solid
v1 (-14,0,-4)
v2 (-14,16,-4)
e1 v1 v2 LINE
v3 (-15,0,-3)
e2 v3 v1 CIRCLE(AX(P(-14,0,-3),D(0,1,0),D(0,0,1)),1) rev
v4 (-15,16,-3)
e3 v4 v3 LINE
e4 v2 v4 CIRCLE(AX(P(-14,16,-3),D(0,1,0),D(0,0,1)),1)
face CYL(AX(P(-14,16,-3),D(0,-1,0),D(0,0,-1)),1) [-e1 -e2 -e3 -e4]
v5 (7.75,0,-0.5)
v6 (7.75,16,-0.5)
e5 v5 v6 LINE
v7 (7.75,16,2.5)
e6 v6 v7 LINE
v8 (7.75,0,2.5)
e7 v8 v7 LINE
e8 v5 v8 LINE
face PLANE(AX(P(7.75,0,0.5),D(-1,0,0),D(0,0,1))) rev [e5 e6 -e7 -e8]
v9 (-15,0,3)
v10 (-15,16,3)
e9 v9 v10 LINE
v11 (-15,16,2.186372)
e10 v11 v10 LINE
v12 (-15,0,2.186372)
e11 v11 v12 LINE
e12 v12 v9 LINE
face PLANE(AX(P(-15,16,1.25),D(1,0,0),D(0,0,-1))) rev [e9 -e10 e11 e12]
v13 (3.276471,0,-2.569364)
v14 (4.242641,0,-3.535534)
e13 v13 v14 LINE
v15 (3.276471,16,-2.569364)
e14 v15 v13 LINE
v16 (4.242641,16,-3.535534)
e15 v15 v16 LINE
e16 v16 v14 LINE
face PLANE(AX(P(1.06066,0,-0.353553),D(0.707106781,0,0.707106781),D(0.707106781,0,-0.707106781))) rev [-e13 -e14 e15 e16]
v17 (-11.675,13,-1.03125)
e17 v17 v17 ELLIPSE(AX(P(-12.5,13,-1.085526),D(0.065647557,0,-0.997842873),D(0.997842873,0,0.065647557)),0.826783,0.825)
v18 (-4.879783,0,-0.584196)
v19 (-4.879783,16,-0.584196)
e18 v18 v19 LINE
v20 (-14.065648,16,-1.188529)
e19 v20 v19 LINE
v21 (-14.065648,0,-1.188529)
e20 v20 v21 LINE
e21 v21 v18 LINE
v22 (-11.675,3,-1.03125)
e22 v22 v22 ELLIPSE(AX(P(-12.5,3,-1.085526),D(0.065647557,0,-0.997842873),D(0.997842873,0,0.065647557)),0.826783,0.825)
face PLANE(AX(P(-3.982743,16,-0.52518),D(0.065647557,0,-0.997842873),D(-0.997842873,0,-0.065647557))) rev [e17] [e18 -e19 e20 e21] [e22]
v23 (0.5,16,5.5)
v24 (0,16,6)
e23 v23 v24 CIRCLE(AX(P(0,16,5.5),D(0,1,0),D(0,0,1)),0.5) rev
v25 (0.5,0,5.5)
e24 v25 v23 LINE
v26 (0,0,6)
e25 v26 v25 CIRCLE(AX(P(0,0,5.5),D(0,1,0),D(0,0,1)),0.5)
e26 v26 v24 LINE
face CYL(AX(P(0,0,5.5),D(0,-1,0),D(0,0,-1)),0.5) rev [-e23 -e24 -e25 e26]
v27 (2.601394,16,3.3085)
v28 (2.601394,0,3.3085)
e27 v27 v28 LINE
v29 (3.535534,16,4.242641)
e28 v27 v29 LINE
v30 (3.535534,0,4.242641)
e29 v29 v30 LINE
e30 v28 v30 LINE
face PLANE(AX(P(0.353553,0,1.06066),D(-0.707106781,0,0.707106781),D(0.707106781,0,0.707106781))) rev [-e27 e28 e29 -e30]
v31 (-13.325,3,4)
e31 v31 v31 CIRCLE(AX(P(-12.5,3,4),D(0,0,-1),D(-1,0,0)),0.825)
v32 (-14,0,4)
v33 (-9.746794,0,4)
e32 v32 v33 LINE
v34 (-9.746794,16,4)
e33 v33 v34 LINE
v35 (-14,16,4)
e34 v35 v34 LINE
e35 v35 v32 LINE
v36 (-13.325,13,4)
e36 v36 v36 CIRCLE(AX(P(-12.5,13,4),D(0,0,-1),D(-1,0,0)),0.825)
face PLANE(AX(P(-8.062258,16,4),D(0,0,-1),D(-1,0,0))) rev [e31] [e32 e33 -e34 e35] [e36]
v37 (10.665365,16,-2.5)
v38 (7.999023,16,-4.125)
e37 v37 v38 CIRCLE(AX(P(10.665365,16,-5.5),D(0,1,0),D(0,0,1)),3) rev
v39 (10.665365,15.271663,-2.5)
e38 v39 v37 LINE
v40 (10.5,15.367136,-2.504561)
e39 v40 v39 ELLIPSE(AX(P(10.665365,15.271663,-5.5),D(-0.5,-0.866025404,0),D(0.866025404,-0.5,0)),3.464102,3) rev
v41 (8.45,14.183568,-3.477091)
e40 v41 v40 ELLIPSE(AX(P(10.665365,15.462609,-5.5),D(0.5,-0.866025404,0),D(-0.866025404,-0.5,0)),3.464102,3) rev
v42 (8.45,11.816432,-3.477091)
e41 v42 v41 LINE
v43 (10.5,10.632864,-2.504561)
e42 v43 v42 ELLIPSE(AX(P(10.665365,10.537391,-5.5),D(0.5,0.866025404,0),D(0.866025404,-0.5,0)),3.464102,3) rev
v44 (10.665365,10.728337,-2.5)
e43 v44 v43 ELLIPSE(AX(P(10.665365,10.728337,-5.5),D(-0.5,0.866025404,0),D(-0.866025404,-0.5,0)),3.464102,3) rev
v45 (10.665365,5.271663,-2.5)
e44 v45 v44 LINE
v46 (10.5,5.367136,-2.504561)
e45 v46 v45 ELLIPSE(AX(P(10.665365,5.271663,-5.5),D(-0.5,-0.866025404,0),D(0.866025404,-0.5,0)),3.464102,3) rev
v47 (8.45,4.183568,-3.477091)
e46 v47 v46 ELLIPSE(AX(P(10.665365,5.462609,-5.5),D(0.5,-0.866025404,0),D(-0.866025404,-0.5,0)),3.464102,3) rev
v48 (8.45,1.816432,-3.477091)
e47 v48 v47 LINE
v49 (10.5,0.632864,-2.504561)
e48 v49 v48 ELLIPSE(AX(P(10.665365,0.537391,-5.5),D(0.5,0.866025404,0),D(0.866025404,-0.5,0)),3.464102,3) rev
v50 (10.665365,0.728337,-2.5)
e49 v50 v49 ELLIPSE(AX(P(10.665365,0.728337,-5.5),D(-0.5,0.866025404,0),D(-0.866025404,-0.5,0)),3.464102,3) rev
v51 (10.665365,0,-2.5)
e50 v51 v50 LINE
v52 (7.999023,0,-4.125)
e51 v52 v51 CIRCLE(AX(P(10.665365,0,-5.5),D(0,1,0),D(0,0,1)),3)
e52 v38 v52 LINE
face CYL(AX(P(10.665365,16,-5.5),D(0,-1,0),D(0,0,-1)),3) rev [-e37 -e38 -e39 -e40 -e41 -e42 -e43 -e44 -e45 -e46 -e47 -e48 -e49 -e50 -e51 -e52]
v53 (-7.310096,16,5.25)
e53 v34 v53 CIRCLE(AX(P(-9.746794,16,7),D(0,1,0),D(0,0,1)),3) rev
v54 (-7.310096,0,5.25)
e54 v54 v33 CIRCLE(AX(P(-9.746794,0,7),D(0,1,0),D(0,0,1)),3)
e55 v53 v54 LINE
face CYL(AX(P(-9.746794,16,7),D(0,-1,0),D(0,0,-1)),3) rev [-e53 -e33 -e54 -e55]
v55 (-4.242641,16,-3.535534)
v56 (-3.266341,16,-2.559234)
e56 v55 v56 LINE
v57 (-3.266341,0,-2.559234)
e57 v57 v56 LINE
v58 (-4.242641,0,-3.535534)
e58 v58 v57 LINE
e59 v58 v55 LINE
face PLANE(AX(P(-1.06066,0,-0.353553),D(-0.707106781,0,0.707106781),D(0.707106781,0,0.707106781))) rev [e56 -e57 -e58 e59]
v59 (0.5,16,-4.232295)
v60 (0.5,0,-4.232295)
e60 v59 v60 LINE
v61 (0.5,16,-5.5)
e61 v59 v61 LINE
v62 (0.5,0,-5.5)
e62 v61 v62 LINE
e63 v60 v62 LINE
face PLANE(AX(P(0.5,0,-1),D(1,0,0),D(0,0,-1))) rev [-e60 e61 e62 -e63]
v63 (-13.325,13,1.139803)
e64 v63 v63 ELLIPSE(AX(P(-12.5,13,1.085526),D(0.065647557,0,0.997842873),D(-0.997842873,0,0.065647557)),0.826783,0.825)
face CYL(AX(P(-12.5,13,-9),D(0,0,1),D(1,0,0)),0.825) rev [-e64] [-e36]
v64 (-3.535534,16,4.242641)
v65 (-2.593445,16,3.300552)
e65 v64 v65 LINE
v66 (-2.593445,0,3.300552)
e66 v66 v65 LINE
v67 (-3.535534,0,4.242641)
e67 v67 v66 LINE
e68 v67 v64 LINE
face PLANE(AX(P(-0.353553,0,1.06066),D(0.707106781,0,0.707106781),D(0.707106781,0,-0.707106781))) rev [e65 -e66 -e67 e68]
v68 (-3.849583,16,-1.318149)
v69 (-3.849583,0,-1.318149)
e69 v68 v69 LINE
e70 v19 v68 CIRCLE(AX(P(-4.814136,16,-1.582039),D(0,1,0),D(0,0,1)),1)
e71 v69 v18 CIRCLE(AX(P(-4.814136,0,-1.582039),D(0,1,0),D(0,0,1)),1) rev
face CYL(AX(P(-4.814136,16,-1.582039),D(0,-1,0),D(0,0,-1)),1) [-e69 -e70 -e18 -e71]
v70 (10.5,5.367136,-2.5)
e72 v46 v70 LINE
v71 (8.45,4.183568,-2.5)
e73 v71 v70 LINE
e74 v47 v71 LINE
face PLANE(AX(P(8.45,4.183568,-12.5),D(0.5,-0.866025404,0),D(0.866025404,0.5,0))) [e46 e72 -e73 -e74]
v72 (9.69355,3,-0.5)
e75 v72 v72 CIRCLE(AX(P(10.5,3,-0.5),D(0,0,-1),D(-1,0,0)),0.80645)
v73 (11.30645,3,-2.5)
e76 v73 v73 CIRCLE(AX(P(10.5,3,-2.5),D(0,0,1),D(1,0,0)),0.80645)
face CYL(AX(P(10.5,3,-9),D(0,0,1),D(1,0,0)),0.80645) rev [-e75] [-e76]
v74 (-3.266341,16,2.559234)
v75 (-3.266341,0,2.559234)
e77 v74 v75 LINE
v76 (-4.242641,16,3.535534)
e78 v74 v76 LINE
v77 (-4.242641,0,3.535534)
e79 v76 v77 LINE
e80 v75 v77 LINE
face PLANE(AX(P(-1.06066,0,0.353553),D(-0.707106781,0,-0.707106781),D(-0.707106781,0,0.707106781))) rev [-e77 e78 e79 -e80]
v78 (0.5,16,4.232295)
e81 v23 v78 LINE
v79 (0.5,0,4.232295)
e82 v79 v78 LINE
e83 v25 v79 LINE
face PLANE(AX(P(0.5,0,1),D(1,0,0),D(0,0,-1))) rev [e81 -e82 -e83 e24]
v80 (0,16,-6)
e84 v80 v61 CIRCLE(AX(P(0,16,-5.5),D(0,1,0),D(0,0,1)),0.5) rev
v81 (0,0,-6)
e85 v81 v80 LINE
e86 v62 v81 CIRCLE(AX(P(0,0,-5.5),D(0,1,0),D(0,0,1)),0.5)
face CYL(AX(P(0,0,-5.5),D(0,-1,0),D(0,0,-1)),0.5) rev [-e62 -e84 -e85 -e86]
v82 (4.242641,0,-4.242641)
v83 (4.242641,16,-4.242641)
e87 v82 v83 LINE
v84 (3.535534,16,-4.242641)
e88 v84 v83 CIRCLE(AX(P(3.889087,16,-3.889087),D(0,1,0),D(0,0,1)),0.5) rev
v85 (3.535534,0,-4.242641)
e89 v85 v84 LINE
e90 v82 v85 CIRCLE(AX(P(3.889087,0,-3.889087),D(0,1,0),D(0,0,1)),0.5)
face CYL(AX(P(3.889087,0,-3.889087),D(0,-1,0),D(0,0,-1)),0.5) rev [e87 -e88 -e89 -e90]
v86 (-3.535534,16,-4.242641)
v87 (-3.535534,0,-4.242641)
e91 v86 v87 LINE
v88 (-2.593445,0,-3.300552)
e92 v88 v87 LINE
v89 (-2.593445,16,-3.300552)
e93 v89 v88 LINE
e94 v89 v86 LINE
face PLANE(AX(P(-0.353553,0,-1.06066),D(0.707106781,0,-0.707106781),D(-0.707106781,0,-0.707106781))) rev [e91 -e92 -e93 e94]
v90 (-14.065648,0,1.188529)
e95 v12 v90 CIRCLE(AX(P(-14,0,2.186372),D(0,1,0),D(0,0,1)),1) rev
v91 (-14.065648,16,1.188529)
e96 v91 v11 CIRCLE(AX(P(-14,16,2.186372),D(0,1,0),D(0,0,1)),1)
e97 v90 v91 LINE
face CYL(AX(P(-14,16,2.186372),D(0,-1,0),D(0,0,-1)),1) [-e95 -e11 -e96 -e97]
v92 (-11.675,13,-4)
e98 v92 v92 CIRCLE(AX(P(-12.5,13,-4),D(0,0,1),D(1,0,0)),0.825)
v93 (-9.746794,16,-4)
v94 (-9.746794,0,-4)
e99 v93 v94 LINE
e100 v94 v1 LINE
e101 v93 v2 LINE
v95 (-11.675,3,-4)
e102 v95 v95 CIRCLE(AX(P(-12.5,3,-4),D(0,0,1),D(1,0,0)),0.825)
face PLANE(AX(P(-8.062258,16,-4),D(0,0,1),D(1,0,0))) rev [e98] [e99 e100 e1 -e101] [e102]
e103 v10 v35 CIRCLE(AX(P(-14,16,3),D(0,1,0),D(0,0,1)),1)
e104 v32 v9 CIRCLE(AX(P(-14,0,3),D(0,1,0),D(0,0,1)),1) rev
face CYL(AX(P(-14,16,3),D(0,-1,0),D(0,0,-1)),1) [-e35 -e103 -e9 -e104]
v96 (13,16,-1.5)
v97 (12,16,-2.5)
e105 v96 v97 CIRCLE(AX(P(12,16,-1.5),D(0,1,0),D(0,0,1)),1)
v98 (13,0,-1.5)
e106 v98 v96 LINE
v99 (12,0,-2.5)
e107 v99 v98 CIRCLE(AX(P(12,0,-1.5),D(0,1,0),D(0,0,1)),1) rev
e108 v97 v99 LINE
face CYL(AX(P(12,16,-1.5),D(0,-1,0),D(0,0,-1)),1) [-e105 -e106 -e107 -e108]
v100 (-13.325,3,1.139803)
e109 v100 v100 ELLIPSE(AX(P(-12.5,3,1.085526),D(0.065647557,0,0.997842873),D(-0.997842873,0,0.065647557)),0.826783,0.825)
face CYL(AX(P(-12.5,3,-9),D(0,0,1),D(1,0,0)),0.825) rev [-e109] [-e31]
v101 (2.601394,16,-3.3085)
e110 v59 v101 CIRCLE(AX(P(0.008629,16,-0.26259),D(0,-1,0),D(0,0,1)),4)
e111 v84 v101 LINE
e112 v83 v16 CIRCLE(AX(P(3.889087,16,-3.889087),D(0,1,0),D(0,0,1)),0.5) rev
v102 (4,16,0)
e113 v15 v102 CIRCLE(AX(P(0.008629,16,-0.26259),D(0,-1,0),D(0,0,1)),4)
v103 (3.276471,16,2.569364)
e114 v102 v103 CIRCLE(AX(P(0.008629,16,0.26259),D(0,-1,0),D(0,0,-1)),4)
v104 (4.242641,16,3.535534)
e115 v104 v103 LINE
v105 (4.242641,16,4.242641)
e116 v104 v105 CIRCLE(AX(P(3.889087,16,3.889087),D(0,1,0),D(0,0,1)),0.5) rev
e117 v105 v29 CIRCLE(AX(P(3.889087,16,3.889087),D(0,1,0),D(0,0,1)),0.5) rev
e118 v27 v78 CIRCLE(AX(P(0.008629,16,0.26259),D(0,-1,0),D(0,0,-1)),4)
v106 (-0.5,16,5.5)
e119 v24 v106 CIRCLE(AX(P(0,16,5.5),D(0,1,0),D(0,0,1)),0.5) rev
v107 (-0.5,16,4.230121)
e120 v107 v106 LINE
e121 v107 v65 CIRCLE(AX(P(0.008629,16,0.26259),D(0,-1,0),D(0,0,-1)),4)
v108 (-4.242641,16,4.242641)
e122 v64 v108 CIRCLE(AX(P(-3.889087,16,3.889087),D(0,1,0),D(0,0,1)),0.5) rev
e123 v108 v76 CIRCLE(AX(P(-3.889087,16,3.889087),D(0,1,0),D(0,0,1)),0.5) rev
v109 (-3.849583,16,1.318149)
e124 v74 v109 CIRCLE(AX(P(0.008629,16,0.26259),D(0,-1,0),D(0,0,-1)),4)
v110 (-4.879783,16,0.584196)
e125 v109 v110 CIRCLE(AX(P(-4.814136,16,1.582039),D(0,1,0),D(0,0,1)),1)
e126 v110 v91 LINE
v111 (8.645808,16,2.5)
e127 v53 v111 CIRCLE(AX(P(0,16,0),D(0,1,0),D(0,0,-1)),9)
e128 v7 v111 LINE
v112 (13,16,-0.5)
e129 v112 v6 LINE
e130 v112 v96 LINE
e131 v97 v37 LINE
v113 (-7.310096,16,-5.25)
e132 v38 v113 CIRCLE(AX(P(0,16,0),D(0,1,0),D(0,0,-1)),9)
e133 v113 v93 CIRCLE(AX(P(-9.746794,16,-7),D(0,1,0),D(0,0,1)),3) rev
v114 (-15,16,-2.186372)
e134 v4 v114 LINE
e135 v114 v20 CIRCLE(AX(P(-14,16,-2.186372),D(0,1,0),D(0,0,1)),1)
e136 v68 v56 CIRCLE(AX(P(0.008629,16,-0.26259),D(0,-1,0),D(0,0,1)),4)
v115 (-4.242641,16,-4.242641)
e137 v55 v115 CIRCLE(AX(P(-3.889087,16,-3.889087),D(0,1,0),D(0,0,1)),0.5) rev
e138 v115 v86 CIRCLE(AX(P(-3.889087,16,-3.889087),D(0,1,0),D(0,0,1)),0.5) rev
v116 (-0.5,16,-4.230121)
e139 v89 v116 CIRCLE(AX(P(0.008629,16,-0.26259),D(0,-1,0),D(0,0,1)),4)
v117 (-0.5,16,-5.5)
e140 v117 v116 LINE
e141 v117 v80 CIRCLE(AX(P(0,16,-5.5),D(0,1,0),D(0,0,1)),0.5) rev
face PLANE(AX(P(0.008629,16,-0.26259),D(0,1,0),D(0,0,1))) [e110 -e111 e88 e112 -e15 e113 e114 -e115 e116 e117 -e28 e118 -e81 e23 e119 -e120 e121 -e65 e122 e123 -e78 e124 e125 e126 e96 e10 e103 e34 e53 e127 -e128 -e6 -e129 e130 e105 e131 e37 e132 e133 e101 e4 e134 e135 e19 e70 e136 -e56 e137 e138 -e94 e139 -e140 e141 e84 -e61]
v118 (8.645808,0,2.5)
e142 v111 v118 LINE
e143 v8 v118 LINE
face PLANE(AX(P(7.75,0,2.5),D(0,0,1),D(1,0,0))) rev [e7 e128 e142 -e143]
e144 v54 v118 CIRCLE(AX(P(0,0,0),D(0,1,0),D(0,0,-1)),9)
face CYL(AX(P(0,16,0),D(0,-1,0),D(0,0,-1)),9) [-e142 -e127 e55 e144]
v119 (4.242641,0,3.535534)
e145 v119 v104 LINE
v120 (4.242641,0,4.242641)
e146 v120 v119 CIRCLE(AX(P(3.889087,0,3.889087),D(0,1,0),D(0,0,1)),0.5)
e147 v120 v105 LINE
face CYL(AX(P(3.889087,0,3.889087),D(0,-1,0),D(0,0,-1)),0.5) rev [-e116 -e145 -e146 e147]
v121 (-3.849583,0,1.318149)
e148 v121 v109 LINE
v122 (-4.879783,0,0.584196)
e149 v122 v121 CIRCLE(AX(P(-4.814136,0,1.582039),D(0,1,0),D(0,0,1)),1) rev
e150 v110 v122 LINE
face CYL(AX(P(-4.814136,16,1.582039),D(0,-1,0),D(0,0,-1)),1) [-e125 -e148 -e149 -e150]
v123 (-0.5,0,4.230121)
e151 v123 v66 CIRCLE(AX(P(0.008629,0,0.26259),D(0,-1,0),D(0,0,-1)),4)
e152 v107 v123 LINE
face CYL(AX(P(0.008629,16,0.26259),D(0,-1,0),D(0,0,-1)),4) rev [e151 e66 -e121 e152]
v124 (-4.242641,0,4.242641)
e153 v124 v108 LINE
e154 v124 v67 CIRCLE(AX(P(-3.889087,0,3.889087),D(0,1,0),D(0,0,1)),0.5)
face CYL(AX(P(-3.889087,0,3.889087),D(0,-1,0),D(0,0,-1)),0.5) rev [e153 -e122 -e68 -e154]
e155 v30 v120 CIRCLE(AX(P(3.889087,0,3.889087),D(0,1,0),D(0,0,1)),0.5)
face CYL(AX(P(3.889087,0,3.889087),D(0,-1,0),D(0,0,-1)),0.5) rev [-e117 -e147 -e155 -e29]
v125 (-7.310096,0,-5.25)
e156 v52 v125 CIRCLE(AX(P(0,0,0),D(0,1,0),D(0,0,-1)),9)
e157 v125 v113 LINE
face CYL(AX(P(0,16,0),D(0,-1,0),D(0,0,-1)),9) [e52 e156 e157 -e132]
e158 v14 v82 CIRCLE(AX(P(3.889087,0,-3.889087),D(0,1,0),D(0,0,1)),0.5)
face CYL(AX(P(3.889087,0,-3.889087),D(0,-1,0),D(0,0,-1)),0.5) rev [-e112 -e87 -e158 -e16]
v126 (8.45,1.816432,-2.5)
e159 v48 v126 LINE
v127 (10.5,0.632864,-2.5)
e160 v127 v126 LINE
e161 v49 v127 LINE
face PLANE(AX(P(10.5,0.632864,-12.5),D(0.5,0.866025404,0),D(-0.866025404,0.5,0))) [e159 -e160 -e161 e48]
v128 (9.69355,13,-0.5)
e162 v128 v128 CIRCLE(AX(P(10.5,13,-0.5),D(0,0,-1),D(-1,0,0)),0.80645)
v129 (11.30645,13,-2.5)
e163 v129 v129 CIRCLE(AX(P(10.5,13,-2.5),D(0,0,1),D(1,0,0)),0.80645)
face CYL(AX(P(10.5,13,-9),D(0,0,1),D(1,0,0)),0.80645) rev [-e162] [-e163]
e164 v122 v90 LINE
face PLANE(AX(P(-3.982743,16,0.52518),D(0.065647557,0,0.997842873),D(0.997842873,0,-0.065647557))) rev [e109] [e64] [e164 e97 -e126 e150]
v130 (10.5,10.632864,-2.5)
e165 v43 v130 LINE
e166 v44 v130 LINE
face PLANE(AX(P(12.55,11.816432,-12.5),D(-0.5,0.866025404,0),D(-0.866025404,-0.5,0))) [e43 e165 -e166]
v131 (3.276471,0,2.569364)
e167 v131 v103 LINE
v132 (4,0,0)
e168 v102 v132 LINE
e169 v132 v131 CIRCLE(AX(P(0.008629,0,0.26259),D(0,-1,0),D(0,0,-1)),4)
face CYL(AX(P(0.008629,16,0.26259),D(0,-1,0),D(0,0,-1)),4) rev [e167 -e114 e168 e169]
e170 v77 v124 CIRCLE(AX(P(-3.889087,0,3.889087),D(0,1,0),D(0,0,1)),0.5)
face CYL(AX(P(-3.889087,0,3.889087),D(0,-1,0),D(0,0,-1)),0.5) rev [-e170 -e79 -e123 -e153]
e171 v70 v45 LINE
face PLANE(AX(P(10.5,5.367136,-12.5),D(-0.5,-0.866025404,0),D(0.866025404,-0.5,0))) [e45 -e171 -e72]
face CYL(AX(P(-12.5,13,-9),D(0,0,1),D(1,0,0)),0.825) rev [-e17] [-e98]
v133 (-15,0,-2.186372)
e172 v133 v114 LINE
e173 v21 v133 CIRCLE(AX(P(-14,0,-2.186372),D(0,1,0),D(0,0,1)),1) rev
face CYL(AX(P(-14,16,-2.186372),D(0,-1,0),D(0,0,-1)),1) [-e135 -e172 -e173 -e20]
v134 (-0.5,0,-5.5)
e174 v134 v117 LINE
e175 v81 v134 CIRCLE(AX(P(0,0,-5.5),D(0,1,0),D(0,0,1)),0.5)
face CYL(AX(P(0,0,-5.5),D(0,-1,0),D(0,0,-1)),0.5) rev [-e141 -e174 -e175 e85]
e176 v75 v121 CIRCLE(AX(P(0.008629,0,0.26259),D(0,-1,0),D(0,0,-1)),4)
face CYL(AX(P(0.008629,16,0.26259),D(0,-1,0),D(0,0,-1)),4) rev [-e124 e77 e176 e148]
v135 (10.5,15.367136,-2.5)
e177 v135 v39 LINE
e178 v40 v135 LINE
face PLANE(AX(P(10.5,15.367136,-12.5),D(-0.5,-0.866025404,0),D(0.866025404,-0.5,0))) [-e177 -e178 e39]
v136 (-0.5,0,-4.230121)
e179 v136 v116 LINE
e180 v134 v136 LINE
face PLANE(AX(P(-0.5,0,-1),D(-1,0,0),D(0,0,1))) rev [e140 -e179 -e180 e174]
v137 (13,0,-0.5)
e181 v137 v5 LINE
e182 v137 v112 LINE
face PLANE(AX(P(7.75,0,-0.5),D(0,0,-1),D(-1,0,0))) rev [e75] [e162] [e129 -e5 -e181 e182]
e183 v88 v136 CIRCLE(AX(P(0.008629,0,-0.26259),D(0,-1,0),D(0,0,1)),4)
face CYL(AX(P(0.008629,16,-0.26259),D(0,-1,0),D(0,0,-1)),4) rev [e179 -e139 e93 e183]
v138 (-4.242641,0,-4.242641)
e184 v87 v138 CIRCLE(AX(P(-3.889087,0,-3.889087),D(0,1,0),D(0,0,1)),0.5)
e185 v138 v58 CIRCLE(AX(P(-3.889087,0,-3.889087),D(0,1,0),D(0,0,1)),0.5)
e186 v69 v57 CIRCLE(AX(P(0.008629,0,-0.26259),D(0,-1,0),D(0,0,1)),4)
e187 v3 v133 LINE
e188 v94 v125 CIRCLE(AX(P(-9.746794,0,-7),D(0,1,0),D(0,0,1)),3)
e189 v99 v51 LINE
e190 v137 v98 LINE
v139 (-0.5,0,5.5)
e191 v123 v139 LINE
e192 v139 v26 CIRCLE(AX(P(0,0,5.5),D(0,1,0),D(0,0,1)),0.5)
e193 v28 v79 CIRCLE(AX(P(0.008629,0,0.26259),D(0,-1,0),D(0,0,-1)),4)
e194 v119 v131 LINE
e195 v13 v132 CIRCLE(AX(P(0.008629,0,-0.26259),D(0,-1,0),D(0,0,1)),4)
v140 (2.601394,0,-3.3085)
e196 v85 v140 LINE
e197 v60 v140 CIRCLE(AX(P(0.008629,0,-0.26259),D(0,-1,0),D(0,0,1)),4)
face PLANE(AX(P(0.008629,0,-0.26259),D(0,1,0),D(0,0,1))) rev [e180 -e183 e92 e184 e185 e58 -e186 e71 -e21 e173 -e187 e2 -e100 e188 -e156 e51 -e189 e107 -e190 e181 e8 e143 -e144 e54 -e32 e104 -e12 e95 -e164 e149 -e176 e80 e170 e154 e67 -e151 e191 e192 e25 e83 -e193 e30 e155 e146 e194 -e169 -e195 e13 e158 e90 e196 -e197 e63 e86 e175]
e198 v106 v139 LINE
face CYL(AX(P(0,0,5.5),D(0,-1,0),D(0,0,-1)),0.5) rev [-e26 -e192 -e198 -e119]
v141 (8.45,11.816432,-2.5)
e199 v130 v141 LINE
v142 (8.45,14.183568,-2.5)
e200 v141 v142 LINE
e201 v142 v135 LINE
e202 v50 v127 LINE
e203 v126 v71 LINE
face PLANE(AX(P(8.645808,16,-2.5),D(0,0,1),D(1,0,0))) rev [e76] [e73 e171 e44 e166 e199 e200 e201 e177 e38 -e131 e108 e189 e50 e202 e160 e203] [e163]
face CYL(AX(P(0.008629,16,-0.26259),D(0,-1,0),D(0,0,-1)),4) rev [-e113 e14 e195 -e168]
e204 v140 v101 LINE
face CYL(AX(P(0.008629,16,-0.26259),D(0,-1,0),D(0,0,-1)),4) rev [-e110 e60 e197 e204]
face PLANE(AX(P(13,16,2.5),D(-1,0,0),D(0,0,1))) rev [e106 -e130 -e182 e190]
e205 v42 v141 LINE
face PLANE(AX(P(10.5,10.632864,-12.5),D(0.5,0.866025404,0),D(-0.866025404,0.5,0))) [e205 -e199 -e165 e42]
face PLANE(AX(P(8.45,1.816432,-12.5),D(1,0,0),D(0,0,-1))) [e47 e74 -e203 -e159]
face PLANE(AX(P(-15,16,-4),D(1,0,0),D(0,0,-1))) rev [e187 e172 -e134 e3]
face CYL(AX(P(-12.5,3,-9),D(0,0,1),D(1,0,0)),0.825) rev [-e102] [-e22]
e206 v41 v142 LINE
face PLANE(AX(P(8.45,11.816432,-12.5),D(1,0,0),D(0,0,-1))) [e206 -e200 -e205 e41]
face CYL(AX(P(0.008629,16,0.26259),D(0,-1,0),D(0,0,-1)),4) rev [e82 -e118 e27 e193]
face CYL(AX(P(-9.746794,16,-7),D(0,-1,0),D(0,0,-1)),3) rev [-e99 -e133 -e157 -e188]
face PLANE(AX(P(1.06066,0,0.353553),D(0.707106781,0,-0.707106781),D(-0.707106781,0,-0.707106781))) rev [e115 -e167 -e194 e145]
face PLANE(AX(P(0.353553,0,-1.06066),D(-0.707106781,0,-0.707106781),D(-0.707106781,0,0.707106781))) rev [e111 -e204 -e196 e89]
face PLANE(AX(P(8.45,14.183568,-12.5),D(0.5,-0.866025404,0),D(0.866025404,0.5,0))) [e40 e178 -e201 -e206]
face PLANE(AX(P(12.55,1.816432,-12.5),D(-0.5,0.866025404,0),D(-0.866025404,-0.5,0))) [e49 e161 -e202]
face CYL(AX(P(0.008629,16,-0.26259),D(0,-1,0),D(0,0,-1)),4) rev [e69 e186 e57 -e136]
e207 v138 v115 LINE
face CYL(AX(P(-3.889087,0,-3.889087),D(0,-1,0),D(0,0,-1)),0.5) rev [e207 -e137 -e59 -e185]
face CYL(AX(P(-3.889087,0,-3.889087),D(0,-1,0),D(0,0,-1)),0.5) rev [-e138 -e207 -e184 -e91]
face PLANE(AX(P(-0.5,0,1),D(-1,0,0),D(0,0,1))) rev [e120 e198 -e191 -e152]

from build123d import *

# Parameters (mm, degrees)
BOSS_EXTRUDE1_DEPTH      = 16
SKETCH2_W                = 1
SKETCH2_H                = 5
CUT_EXTRUDE1_DEPTH       = 24.706539182
FILLET1_R                = 0.5
CIRPATTERN1_COUNT        = 8
FILLET1_OF_CIRPATTERN1_R = 0.5
CUT_EXTRUDE2_DEPTH       = 24.706539182
CUT_EXTRUDE3_DEPTH       = 24.900836805
CUT_EXTRUDE3_DEPTH_BACK  = 24.900836805
SKETCH5_R                = 0.80645
SKETCH5_R_2              = 0.825
FILLET2_R                = 1
FILLET3_R                = 3
CUT_EXTRUDE5_DEPTH       = 10


# Some blends are built 0.0001 mm under size
with BuildPart() as part:
    # Sketch1 → Boss-Extrude1 (new body)
    with BuildSketch(Plane(origin=(0, 0, 0), x_dir=(1, 0, 0), z_dir=(0, 1, 0))):
        with BuildLine():
            Line((-3.98274298, -0.525180459), (-15, -1.25))
            Line((-15, -1.25), (-15, -4))
            Line((-15, -4), (-8.062257748, -4))
            ThreePointArc((-8.062257748, -4), (0.804756356, -8.963948193), (8.645808233, -2.5))
            Line((8.645808233, -2.5), (13, -2.5))
            Line((13, -2.5), (13, 2.5))
            Line((13, 2.5), (8.645808233, 2.5))
            ThreePointArc((8.645808233, 2.5), (0.804756356, 8.963948193), (-8.062257748, 4))
            Line((-8.062257748, 4), (-15, 4))
            Line((-15, 4), (-15, 1.25))
            Line((-15, 1.25), (-3.98274298, 0.525180459))
            ThreePointArc((-3.98274298, 0.525180459), (0.27121874, 4.25396172), (4, 0))
            ThreePointArc((4, 0), (0.27121874, -4.25396172), (-3.98274298, -0.525180459))
        make_face()
    extrude(amount=BOSS_EXTRUDE1_DEPTH)

    # Sketch2 → Cut-Extrude1 (cut, through all)
    with BuildSketch(Plane(origin=(0, 16, 0), x_dir=(1, 0, 0), z_dir=(0, 1, 0))):
        with Locations((0, 3.5)):
            Rectangle(SKETCH2_W, SKETCH2_H)
    cut_extrude1 = extrude(amount=-CUT_EXTRUDE1_DEPTH, mode=Mode.SUBTRACT)

    # Fillet1
    fillet1_edges = [part.edges().sort_by_distance(p)[0] for p in [
        (-0.5, 8, -6),
        (0.5, 8, -6),
    ]]
    fillet(fillet1_edges, radius=FILLET1_R - 0.0001)  # a hair under: the kernel refuses the full size

    # CirPattern1: Cut-Extrude1 ×8 about axis, 2 skipped
    cirpattern1_axis = Axis((0, 0, 0), (0, -1, 0))
    add([cut_extrude1.rotate(cirpattern1_axis, i * 360 / CIRPATTERN1_COUNT) for i in range(1, CIRPATTERN1_COUNT) if i not in (2, 6)], mode=Mode.SUBTRACT)

    # Fillet1 of CirPattern1
    fillet1_of_cirpattern1_edges = [part.edges().sort_by_distance(p)[0] for p in [
        (3.889087297, 8, -4.596194078),
        (4.596194078, 8, -3.889087297),
        (4.596194078, 8, 3.889087297),
        (3.889087297, 8, 4.596194078),
        (0.5, 8, 6),
        (-0.5, 8, 6),
        (-3.889087297, 8, 4.596194078),
        (-4.596194078, 8, 3.889087297),
        (-4.596194078, 8, -3.889087297),
        (-3.889087297, 8, -4.596194078),
    ]]
    fillet(fillet1_of_cirpattern1_edges, radius=FILLET1_OF_CIRPATTERN1_R - 0.0001)  # a hair under: the kernel refuses the full size

    # Sketch4 → Cut-Extrude2 (cut, through all)
    with BuildSketch(Plane(origin=(0, 16, 0), x_dir=(1, 0, 0), z_dir=(0, 1, 0))):
        Polygon((7.75, -0.5), (7.75, 0.5), (13, 0.5), (13, -0.5), (13, -2.5), (7.75, -2.5), align=None)
    extrude(amount=-CUT_EXTRUDE2_DEPTH, mode=Mode.SUBTRACT)

    # Sketch5 → Cut-Extrude3 (cut, two sides: drawn at the far end of the back side and taken through both)
    with BuildSketch(Plane.XY.offset(-0.5).offset(-CUT_EXTRUDE3_DEPTH_BACK)):
        with Locations((10.5, 13)):
            Circle(SKETCH5_R)
        with Locations((10.5, 3)):
            Circle(SKETCH5_R)
        with Locations((-12.5, 13)):
            Circle(SKETCH5_R_2)
        with Locations((-12.5, 3)):
            Circle(SKETCH5_R_2)
    extrude(amount=CUT_EXTRUDE3_DEPTH + CUT_EXTRUDE3_DEPTH_BACK, mode=Mode.SUBTRACT)

    # Fillet2
    fillet2_edges = [part.edges().sort_by_distance(p)[0] for p in [
        (-3.98274298, 8, -0.525180459),
        (-15, 8, -1.25),
        (-15, 8, -4),
        (13, 8, -2.5),
        (-15, 8, 4),
        (-15, 8, 1.25),
        (-3.98274298, 8, 0.525180459),
    ]]
    fillet(fillet2_edges, radius=FILLET2_R)

    # Fillet3
    # the kernel refuses this fillet: 3 mm, written as the material it adds along each edge
    with BuildSketch(Plane(origin=(-8.062257748, 0, -4), x_dir=(-1, 0, 0), z_dir=(0, 1, 0))) as fillet3_piece_1:
        with BuildLine():
            CenterArc((1.684536597, -3), FILLET3_R, 90, 54.314665287)
            ThreePointArc((-0.75216199, -1.25), (-0.350711983, -0.640265285), (0, 0))
            Line((0, 0), (1.684536597, 0))
        make_face()
    extrude(amount=16)
    with BuildSketch(Plane(origin=(8.645808233, 0, -2.5), x_dir=(-0.36980540281703944, 0, -0.9291092314939762), z_dir=(0, 1, 0))) as fillet3_piece_2_section:
        with BuildLine():
            CenterArc((2.040484874, -2.985804583), FILLET3_R, 95.575996261, 62.720387264)
            Line((-0.74684282, -1.876388375), (0, 0))
            ThreePointArc((0, 0), (0.874493518, -0.04258625), (1.748987035, 0))
        make_face()
    fillet3_piece_2 = extrude(amount=16, mode=Mode.PRIVATE)
    fillet3_piece_2 = fillet3_piece_2 - Plane(origin=(10.5, 13, -2.86106774), x_dir=(1, 0, 0), z_dir=(0, 0, 1)) * Cylinder(0.80645, 40, mode=Mode.PRIVATE)
    fillet3_piece_2 = fillet3_piece_2 - Plane(origin=(10.5, 3, -2.86106774), x_dir=(1, 0, 0), z_dir=(0, 0, 1)) * Cylinder(0.80645, 40, mode=Mode.PRIVATE)
    add(fillet3_piece_2)
    with BuildSketch(Plane(origin=(-8.062257748, 0, 4), x_dir=(0.5155850316607751, 0, 0.8568384183306427), z_dir=(0, 1, 0))) as fillet3_piece_3:
        with BuildLine():
            CenterArc((1.701993401, -2.990130768), FILLET3_R, 94.648767376, 54.314665287)
            Line((-0.868521854, -1.443375673), (0, 0))
            ThreePointArc((0, 0), (0.729425743, -0.029607696), (1.458851486, 0))
        make_face()
    extrude(amount=16)

    # Sketch7 → Cut-Extrude5 (cut)
    with BuildSketch(Plane(origin=(0, 0, -2.5), x_dir=(-1, 0, 0), z_dir=(0, 0, -1))):
        Polygon((-10.5, 15.367136104), (-12.55, 14.183568052), (-12.55, 11.816431948), (-10.5, 10.632863896), (-8.45, 11.816431948), (-8.45, 14.183568052), align=None)
        Polygon((-10.5, 5.367136104), (-12.55, 4.183568052), (-12.55, 1.816431948), (-10.5, 0.632863896), (-8.45, 1.816431948), (-8.45, 4.183568052), align=None)
    extrude(amount=CUT_EXTRUDE5_DEPTH, mode=Mode.SUBTRACT)


solid = part.part
